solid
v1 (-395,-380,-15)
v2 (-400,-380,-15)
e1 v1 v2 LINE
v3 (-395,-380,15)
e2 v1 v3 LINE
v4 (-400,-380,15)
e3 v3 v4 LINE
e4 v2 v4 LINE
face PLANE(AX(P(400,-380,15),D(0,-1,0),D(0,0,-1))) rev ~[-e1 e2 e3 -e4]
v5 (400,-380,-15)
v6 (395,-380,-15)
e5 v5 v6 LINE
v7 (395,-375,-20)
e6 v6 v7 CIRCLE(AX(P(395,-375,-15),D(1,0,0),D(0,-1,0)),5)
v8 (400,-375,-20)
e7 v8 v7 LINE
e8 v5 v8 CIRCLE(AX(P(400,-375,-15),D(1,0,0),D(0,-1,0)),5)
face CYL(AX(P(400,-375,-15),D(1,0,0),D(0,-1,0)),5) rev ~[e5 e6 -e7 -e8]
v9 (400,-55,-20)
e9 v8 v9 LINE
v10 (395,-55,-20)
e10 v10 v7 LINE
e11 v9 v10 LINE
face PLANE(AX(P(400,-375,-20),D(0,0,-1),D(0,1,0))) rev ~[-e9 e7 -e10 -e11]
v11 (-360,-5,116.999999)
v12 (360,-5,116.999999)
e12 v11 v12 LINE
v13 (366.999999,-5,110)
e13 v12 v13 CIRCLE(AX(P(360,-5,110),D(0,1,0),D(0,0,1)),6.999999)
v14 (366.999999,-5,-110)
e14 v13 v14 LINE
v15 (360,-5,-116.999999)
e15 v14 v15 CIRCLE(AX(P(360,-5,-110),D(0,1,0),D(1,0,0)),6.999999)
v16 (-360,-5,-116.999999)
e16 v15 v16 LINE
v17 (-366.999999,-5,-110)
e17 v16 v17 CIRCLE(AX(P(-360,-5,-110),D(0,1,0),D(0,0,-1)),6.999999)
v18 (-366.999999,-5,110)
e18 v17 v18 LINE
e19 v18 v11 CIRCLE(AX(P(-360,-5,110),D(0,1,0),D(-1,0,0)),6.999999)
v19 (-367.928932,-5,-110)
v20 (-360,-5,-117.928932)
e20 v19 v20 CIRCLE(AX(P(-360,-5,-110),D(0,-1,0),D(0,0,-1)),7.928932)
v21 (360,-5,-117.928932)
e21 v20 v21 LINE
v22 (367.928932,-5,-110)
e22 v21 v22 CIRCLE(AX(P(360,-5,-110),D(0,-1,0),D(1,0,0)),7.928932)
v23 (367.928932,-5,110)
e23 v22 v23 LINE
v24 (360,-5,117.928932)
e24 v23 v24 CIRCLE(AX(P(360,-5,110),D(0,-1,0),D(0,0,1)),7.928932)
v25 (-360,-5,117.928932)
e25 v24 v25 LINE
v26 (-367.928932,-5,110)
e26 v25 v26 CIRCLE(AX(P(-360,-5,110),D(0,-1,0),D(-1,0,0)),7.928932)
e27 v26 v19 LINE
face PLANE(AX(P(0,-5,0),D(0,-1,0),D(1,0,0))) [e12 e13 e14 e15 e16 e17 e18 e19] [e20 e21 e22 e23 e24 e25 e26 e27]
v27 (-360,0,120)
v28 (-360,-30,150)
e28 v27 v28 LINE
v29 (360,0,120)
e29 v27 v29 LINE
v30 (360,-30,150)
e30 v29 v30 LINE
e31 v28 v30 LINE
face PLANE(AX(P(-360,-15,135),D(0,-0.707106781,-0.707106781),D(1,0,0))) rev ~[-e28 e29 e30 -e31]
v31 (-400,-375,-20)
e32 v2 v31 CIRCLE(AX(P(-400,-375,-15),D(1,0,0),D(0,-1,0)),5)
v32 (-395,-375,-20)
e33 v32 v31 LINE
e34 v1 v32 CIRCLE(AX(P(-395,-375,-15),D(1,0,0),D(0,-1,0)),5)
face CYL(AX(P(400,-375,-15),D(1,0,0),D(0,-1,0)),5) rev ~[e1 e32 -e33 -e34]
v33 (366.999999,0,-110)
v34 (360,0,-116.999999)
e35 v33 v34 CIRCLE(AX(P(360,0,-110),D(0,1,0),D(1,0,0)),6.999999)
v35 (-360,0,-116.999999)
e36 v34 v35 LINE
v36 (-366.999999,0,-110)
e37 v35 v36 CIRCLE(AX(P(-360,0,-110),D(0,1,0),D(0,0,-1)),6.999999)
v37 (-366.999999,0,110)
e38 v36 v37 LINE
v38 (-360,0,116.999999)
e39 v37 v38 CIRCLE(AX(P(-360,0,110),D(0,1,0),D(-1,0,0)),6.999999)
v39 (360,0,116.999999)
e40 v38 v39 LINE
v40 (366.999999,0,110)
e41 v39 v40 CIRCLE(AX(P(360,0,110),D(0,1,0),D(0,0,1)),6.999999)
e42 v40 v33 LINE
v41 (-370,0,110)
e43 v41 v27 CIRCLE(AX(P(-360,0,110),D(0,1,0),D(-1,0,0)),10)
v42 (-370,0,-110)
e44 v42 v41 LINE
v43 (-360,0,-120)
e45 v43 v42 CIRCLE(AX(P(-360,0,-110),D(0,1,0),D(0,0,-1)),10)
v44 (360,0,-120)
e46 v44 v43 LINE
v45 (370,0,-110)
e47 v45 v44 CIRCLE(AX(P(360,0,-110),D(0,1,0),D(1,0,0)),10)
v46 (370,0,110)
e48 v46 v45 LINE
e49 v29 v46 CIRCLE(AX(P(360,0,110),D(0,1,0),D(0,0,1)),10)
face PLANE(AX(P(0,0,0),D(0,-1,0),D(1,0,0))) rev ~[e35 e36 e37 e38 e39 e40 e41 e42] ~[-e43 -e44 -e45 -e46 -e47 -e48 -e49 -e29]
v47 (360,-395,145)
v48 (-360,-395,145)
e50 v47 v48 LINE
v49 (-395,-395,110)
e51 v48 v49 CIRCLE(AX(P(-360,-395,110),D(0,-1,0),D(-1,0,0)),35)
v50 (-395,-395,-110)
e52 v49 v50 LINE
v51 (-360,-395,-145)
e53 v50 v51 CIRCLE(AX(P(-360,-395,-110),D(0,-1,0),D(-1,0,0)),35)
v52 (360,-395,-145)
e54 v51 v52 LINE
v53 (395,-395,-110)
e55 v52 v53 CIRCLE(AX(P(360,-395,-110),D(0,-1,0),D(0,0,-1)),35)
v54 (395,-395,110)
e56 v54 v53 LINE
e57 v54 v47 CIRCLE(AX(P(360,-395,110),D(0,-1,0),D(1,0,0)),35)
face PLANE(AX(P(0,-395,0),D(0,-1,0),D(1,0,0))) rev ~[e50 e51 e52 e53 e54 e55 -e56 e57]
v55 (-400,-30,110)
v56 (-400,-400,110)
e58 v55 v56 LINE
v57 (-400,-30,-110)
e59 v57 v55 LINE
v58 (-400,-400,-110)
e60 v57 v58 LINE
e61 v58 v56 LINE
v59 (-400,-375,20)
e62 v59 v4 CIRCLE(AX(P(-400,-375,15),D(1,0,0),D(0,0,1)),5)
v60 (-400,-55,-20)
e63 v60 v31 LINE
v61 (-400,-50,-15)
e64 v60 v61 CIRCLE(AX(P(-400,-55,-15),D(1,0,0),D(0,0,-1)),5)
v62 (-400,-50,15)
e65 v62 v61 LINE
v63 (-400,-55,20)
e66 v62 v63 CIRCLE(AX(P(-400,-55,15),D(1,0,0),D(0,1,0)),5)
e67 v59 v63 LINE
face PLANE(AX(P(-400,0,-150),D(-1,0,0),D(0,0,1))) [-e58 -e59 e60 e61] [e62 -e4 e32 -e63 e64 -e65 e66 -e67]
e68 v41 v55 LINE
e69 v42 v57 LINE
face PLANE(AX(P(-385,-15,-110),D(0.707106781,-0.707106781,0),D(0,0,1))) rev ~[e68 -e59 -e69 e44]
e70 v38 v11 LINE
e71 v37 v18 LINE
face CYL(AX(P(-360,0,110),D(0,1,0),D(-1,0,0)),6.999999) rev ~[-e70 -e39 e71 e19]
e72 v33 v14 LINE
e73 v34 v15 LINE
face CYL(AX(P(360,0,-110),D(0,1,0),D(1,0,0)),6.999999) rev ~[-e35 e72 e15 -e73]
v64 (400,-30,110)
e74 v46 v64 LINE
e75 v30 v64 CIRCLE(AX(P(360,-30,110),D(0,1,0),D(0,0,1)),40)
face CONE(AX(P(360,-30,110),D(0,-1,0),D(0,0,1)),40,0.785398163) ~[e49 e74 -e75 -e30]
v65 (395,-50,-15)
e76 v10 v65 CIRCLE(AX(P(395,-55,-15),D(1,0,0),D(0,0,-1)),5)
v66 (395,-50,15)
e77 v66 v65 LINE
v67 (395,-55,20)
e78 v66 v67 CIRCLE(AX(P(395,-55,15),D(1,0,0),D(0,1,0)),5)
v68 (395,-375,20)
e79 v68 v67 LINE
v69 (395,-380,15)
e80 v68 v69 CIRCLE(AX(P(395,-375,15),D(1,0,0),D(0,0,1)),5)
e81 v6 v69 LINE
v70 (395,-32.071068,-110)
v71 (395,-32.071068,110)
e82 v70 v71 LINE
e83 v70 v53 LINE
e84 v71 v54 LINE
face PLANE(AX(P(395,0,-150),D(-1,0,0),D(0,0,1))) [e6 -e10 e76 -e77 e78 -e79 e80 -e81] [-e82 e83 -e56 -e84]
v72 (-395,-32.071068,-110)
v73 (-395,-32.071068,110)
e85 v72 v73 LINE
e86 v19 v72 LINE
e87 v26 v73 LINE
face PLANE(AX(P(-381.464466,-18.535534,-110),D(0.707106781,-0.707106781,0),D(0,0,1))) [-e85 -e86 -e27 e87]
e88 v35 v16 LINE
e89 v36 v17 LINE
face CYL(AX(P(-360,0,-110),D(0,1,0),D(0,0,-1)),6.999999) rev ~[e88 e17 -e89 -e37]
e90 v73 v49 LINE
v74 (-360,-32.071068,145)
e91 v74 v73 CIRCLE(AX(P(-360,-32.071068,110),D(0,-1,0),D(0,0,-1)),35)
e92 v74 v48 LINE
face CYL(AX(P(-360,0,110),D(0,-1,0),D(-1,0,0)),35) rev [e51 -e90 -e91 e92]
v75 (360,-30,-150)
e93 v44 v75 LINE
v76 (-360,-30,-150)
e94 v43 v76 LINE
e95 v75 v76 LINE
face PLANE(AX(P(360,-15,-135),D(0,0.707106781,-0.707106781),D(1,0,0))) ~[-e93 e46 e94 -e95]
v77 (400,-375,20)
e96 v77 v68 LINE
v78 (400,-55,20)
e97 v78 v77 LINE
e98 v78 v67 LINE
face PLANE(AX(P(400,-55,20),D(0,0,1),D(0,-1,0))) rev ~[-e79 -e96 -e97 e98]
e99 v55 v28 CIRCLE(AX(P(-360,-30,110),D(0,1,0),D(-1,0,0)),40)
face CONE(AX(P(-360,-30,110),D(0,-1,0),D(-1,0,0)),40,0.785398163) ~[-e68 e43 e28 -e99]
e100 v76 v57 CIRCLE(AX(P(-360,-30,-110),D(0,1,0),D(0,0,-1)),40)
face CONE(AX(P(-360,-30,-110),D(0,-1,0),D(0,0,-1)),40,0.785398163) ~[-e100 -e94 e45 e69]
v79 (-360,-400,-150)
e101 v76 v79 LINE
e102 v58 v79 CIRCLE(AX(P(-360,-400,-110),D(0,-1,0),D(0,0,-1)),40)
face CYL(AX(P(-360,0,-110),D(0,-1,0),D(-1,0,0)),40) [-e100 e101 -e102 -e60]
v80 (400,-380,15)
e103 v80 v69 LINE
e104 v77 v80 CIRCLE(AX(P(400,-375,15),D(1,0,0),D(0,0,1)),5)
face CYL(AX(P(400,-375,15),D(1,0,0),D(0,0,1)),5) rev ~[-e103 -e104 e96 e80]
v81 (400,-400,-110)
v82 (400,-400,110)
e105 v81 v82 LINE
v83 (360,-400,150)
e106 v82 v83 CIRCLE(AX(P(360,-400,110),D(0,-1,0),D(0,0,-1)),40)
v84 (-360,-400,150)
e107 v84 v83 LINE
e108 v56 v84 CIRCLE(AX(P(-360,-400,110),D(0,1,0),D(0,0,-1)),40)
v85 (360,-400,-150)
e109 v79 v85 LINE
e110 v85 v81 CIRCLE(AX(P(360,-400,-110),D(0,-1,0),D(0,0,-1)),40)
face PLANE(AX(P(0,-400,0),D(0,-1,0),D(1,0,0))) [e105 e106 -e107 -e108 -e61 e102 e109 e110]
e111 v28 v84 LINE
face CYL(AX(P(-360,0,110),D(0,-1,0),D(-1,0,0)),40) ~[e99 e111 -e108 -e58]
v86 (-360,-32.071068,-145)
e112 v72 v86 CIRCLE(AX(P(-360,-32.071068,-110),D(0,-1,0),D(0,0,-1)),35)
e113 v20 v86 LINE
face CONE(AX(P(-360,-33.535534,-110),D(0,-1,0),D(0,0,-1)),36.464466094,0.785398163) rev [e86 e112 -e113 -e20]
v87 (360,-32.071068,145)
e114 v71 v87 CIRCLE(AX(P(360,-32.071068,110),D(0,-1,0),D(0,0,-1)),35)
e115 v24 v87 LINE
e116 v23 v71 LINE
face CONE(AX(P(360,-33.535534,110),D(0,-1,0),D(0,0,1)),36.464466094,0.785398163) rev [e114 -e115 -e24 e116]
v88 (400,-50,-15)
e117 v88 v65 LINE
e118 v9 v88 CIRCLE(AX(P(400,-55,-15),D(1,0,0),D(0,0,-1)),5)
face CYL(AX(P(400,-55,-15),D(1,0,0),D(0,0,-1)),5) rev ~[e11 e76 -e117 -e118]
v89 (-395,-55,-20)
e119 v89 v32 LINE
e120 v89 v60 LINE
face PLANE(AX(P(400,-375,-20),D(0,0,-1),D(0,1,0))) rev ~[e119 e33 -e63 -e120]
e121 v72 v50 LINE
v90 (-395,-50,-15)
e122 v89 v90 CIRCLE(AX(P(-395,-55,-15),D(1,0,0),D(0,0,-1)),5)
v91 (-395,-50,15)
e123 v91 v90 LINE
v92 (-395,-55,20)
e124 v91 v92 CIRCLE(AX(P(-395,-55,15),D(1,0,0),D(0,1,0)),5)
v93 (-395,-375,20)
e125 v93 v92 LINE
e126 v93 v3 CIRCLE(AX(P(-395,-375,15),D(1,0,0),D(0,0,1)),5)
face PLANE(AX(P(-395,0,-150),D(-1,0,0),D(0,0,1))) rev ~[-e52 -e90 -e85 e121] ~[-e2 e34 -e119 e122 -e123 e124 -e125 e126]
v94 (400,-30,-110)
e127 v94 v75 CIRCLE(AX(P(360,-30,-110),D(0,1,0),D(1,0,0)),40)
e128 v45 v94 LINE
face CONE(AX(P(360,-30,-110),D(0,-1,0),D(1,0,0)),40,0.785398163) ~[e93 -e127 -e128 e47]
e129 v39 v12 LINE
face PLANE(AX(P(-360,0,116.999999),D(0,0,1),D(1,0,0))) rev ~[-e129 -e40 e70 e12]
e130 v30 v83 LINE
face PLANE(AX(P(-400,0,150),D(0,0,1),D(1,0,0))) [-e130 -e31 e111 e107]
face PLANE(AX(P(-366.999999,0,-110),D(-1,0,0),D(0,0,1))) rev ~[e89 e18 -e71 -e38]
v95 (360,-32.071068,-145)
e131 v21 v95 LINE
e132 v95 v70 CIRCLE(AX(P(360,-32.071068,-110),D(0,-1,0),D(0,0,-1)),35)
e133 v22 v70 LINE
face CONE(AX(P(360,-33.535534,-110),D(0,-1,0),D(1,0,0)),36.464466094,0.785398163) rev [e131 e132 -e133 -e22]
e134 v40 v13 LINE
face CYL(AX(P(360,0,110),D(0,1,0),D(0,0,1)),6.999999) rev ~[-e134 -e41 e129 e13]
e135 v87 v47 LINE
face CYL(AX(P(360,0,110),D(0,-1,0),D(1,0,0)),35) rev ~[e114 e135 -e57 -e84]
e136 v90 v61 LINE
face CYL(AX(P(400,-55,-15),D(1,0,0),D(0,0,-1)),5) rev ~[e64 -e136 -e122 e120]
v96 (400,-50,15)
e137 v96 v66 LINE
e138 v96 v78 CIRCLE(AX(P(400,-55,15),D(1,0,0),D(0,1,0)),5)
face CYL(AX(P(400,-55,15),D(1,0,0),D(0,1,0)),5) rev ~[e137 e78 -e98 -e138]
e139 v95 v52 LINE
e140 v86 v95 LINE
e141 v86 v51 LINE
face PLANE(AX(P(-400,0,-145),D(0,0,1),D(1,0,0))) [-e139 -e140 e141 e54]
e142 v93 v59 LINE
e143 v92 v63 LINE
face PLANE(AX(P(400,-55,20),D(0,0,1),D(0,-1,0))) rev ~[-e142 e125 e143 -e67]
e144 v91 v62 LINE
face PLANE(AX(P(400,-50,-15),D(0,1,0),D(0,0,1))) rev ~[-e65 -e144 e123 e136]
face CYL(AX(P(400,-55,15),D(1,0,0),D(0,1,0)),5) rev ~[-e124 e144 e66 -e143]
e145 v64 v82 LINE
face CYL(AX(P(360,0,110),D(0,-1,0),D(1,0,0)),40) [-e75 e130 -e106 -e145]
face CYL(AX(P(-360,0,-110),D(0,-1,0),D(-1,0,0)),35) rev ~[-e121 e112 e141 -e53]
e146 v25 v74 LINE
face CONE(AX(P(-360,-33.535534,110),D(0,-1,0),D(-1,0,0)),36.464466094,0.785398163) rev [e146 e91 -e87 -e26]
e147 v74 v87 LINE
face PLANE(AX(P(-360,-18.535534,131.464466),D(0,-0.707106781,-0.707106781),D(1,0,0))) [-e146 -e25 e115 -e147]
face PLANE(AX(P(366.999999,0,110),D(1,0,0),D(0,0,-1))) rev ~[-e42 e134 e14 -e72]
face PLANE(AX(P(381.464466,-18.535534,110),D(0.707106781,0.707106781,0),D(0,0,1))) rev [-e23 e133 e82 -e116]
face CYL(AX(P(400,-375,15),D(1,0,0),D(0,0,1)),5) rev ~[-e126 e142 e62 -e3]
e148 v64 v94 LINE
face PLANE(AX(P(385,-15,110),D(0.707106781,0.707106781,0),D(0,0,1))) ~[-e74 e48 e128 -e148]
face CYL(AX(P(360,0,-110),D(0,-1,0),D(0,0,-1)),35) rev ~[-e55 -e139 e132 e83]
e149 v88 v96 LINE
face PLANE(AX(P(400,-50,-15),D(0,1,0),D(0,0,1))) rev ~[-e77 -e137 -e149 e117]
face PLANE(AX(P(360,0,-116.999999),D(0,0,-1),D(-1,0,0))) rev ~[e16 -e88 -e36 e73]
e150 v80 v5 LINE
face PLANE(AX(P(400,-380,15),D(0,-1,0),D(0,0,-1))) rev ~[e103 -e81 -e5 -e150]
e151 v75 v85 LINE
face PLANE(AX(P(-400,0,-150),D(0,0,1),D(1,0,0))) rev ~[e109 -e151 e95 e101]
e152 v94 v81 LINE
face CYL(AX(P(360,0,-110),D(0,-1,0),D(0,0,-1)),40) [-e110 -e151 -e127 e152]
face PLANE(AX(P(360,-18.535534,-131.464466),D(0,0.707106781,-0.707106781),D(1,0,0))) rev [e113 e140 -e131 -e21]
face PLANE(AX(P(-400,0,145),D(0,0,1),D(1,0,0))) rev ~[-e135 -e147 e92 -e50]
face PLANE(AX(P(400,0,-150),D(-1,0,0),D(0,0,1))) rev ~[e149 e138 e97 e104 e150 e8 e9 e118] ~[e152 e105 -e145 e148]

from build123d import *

# Parameters (mm, degrees)
F0_W     = 800
F0_H     = 300
F1_DEPTH = 400
F2_R     = 40
F3_SIZE  = 30
F5_DEPTH = 5
F6_T     = 5
F8_DEPTH = 800.001


# Not quite as in the source:
# - a shell that OpenCascade refuses in one call is made with other operations: the cavity is built on its own and cut out


with BuildPart() as f1:
    # F0 (on Front) → F1 (new body)
    with BuildSketch(Plane.XZ):
        Rectangle(F0_W, F0_H)
    extrude(amount=F1_DEPTH)

    # F2
    f2_edges = [f1.edges().sort_by_distance(p)[0] for p in [
        (400, -200, 150),
        (-400, -200, 150),
        (400, -200, -150),
        (-400, -200, -150),
    ]]
    fillet(f2_edges, radius=F2_R)

    # F3
    f3_edges = [f1.edges().sort_by_distance(p)[0] for p in [
        (0, 0, 150),
        (0, 0, -150),
        (-388.284271, 0, -138.284271),
        (388.284271, 0, -138.284271),
        (-400, 0, 0),
        (400, 0, 0),
        (-388.284271, 0, 138.284271),
        (388.284271, 0, 138.284271),
    ]]
    chamfer(f3_edges, length=F3_SIZE)

    # F4 (on face) → F5 (cut)
    with BuildSketch(Plane(origin=(0, 0, 0), x_dir=(-1, 0, 0), z_dir=(0, 1, 0))):
        with BuildLine():
            Line((366.9999986887, -110), (366.9999986887, 110))
            ThreePointArc((366.9999986887, 110), (364.9497465411, 114.9497465411), (360, 116.9999986887))
            Line((360, 116.9999986887), (-360, 116.9999986887))
            ThreePointArc((-360, 116.9999986887), (-364.9497465411, 114.9497465411), (-366.9999986887, 110))
            Line((-366.9999986887, 110), (-366.9999986887, -110))
            ThreePointArc((-366.9999986887, -110), (-364.9497465411, -114.9497465411), (-360, -116.9999986887))
            Line((-360, -116.9999986887), (360, -116.9999986887))
            ThreePointArc((360, -116.9999986887), (364.9497465411, -114.9497465411), (366.9999986887, -110))
        make_face()
    extrude(amount=-F5_DEPTH, mode=Mode.SUBTRACT)

    # F6: shell of thickness 5, made by hand


with BuildPart() as f6_core1:
    # F6_t2: copy of F1
    add(f1.part)

    # the walls: a layer under each face that stays
    f6_faces = [f6_core1.faces().sort_by_distance(p)[0] for p in [
        (0, -215, -150),
        (-388.2842712475, -215, -138.2842712475),
        (0, -15, -135),
        (0, -400, 0),
        (388.2842712475, -215, -138.2842712475),
        (-377.6776695297, -15, -127.6776695297),
        (-400, -215, 0),
        (254.375, 0, -117.037037037),
        (377.6776695297, -15, -127.6776695297),
        (400, -215, 0),
        (-388.2842712475, -215, 138.2842712475),
        (388.2842712475, -215, 138.2842712475),
        (0, -215, 150),
        (-385, -15, 0),
        (0, -15, 135),
        (377.6776695297, -15, 127.6776695297),
        (-377.6776695297, -15, 127.6776695297),
        (385, -15, 0),
        (364.9497465411, -2.5, -114.9497465411),
        (366.9999986887, -2.5, 0),
        (364.9497465411, -2.5, 114.9497465411),
        (0, -2.5, 116.9999986887),
        (-364.9497465411, -2.5, 114.9497465411),
        (-366.9999986887, -2.5, 0),
        (-364.9497465411, -2.5, -114.9497465411),
        (0, -2.5, -116.9999986887),
    ]]
    thicken(f6_faces, amount=-F6_T, mode=Mode.SUBTRACT)


with BuildPart() as f1_1:
    add(f1.part)

    # what is left inside the walls is the cavity
    f6_cavity = [f6_core1.part.solids().sort_by_distance(p)[0] for p in [
        (0, -274.023689, -144.95),
    ]]
    add(f6_cavity, mode=Mode.SUBTRACT)

    # F7 (on face) → F8 (cut, through all)
    with BuildSketch(Plane.YZ.offset(400)):
        with BuildLine():
            Line((-375, -20), (-55, -20))
            ThreePointArc((-55, -20), (-51.4644660941, -18.5355339059), (-50, -15))
            Line((-50, -15), (-50, 15))
            ThreePointArc((-50, 15), (-51.4644660941, 18.5355339059), (-55, 20))
            Line((-55, 20), (-375, 20))
            ThreePointArc((-375, 20), (-378.5355339059, 18.5355339059), (-380, 15))
            Line((-380, 15), (-380, -15))
            ThreePointArc((-380, -15), (-378.5355339059, -18.5355339059), (-375, -20))
        make_face()
    extrude(amount=-F8_DEPTH, mode=Mode.SUBTRACT)


solid = f1_1.part
